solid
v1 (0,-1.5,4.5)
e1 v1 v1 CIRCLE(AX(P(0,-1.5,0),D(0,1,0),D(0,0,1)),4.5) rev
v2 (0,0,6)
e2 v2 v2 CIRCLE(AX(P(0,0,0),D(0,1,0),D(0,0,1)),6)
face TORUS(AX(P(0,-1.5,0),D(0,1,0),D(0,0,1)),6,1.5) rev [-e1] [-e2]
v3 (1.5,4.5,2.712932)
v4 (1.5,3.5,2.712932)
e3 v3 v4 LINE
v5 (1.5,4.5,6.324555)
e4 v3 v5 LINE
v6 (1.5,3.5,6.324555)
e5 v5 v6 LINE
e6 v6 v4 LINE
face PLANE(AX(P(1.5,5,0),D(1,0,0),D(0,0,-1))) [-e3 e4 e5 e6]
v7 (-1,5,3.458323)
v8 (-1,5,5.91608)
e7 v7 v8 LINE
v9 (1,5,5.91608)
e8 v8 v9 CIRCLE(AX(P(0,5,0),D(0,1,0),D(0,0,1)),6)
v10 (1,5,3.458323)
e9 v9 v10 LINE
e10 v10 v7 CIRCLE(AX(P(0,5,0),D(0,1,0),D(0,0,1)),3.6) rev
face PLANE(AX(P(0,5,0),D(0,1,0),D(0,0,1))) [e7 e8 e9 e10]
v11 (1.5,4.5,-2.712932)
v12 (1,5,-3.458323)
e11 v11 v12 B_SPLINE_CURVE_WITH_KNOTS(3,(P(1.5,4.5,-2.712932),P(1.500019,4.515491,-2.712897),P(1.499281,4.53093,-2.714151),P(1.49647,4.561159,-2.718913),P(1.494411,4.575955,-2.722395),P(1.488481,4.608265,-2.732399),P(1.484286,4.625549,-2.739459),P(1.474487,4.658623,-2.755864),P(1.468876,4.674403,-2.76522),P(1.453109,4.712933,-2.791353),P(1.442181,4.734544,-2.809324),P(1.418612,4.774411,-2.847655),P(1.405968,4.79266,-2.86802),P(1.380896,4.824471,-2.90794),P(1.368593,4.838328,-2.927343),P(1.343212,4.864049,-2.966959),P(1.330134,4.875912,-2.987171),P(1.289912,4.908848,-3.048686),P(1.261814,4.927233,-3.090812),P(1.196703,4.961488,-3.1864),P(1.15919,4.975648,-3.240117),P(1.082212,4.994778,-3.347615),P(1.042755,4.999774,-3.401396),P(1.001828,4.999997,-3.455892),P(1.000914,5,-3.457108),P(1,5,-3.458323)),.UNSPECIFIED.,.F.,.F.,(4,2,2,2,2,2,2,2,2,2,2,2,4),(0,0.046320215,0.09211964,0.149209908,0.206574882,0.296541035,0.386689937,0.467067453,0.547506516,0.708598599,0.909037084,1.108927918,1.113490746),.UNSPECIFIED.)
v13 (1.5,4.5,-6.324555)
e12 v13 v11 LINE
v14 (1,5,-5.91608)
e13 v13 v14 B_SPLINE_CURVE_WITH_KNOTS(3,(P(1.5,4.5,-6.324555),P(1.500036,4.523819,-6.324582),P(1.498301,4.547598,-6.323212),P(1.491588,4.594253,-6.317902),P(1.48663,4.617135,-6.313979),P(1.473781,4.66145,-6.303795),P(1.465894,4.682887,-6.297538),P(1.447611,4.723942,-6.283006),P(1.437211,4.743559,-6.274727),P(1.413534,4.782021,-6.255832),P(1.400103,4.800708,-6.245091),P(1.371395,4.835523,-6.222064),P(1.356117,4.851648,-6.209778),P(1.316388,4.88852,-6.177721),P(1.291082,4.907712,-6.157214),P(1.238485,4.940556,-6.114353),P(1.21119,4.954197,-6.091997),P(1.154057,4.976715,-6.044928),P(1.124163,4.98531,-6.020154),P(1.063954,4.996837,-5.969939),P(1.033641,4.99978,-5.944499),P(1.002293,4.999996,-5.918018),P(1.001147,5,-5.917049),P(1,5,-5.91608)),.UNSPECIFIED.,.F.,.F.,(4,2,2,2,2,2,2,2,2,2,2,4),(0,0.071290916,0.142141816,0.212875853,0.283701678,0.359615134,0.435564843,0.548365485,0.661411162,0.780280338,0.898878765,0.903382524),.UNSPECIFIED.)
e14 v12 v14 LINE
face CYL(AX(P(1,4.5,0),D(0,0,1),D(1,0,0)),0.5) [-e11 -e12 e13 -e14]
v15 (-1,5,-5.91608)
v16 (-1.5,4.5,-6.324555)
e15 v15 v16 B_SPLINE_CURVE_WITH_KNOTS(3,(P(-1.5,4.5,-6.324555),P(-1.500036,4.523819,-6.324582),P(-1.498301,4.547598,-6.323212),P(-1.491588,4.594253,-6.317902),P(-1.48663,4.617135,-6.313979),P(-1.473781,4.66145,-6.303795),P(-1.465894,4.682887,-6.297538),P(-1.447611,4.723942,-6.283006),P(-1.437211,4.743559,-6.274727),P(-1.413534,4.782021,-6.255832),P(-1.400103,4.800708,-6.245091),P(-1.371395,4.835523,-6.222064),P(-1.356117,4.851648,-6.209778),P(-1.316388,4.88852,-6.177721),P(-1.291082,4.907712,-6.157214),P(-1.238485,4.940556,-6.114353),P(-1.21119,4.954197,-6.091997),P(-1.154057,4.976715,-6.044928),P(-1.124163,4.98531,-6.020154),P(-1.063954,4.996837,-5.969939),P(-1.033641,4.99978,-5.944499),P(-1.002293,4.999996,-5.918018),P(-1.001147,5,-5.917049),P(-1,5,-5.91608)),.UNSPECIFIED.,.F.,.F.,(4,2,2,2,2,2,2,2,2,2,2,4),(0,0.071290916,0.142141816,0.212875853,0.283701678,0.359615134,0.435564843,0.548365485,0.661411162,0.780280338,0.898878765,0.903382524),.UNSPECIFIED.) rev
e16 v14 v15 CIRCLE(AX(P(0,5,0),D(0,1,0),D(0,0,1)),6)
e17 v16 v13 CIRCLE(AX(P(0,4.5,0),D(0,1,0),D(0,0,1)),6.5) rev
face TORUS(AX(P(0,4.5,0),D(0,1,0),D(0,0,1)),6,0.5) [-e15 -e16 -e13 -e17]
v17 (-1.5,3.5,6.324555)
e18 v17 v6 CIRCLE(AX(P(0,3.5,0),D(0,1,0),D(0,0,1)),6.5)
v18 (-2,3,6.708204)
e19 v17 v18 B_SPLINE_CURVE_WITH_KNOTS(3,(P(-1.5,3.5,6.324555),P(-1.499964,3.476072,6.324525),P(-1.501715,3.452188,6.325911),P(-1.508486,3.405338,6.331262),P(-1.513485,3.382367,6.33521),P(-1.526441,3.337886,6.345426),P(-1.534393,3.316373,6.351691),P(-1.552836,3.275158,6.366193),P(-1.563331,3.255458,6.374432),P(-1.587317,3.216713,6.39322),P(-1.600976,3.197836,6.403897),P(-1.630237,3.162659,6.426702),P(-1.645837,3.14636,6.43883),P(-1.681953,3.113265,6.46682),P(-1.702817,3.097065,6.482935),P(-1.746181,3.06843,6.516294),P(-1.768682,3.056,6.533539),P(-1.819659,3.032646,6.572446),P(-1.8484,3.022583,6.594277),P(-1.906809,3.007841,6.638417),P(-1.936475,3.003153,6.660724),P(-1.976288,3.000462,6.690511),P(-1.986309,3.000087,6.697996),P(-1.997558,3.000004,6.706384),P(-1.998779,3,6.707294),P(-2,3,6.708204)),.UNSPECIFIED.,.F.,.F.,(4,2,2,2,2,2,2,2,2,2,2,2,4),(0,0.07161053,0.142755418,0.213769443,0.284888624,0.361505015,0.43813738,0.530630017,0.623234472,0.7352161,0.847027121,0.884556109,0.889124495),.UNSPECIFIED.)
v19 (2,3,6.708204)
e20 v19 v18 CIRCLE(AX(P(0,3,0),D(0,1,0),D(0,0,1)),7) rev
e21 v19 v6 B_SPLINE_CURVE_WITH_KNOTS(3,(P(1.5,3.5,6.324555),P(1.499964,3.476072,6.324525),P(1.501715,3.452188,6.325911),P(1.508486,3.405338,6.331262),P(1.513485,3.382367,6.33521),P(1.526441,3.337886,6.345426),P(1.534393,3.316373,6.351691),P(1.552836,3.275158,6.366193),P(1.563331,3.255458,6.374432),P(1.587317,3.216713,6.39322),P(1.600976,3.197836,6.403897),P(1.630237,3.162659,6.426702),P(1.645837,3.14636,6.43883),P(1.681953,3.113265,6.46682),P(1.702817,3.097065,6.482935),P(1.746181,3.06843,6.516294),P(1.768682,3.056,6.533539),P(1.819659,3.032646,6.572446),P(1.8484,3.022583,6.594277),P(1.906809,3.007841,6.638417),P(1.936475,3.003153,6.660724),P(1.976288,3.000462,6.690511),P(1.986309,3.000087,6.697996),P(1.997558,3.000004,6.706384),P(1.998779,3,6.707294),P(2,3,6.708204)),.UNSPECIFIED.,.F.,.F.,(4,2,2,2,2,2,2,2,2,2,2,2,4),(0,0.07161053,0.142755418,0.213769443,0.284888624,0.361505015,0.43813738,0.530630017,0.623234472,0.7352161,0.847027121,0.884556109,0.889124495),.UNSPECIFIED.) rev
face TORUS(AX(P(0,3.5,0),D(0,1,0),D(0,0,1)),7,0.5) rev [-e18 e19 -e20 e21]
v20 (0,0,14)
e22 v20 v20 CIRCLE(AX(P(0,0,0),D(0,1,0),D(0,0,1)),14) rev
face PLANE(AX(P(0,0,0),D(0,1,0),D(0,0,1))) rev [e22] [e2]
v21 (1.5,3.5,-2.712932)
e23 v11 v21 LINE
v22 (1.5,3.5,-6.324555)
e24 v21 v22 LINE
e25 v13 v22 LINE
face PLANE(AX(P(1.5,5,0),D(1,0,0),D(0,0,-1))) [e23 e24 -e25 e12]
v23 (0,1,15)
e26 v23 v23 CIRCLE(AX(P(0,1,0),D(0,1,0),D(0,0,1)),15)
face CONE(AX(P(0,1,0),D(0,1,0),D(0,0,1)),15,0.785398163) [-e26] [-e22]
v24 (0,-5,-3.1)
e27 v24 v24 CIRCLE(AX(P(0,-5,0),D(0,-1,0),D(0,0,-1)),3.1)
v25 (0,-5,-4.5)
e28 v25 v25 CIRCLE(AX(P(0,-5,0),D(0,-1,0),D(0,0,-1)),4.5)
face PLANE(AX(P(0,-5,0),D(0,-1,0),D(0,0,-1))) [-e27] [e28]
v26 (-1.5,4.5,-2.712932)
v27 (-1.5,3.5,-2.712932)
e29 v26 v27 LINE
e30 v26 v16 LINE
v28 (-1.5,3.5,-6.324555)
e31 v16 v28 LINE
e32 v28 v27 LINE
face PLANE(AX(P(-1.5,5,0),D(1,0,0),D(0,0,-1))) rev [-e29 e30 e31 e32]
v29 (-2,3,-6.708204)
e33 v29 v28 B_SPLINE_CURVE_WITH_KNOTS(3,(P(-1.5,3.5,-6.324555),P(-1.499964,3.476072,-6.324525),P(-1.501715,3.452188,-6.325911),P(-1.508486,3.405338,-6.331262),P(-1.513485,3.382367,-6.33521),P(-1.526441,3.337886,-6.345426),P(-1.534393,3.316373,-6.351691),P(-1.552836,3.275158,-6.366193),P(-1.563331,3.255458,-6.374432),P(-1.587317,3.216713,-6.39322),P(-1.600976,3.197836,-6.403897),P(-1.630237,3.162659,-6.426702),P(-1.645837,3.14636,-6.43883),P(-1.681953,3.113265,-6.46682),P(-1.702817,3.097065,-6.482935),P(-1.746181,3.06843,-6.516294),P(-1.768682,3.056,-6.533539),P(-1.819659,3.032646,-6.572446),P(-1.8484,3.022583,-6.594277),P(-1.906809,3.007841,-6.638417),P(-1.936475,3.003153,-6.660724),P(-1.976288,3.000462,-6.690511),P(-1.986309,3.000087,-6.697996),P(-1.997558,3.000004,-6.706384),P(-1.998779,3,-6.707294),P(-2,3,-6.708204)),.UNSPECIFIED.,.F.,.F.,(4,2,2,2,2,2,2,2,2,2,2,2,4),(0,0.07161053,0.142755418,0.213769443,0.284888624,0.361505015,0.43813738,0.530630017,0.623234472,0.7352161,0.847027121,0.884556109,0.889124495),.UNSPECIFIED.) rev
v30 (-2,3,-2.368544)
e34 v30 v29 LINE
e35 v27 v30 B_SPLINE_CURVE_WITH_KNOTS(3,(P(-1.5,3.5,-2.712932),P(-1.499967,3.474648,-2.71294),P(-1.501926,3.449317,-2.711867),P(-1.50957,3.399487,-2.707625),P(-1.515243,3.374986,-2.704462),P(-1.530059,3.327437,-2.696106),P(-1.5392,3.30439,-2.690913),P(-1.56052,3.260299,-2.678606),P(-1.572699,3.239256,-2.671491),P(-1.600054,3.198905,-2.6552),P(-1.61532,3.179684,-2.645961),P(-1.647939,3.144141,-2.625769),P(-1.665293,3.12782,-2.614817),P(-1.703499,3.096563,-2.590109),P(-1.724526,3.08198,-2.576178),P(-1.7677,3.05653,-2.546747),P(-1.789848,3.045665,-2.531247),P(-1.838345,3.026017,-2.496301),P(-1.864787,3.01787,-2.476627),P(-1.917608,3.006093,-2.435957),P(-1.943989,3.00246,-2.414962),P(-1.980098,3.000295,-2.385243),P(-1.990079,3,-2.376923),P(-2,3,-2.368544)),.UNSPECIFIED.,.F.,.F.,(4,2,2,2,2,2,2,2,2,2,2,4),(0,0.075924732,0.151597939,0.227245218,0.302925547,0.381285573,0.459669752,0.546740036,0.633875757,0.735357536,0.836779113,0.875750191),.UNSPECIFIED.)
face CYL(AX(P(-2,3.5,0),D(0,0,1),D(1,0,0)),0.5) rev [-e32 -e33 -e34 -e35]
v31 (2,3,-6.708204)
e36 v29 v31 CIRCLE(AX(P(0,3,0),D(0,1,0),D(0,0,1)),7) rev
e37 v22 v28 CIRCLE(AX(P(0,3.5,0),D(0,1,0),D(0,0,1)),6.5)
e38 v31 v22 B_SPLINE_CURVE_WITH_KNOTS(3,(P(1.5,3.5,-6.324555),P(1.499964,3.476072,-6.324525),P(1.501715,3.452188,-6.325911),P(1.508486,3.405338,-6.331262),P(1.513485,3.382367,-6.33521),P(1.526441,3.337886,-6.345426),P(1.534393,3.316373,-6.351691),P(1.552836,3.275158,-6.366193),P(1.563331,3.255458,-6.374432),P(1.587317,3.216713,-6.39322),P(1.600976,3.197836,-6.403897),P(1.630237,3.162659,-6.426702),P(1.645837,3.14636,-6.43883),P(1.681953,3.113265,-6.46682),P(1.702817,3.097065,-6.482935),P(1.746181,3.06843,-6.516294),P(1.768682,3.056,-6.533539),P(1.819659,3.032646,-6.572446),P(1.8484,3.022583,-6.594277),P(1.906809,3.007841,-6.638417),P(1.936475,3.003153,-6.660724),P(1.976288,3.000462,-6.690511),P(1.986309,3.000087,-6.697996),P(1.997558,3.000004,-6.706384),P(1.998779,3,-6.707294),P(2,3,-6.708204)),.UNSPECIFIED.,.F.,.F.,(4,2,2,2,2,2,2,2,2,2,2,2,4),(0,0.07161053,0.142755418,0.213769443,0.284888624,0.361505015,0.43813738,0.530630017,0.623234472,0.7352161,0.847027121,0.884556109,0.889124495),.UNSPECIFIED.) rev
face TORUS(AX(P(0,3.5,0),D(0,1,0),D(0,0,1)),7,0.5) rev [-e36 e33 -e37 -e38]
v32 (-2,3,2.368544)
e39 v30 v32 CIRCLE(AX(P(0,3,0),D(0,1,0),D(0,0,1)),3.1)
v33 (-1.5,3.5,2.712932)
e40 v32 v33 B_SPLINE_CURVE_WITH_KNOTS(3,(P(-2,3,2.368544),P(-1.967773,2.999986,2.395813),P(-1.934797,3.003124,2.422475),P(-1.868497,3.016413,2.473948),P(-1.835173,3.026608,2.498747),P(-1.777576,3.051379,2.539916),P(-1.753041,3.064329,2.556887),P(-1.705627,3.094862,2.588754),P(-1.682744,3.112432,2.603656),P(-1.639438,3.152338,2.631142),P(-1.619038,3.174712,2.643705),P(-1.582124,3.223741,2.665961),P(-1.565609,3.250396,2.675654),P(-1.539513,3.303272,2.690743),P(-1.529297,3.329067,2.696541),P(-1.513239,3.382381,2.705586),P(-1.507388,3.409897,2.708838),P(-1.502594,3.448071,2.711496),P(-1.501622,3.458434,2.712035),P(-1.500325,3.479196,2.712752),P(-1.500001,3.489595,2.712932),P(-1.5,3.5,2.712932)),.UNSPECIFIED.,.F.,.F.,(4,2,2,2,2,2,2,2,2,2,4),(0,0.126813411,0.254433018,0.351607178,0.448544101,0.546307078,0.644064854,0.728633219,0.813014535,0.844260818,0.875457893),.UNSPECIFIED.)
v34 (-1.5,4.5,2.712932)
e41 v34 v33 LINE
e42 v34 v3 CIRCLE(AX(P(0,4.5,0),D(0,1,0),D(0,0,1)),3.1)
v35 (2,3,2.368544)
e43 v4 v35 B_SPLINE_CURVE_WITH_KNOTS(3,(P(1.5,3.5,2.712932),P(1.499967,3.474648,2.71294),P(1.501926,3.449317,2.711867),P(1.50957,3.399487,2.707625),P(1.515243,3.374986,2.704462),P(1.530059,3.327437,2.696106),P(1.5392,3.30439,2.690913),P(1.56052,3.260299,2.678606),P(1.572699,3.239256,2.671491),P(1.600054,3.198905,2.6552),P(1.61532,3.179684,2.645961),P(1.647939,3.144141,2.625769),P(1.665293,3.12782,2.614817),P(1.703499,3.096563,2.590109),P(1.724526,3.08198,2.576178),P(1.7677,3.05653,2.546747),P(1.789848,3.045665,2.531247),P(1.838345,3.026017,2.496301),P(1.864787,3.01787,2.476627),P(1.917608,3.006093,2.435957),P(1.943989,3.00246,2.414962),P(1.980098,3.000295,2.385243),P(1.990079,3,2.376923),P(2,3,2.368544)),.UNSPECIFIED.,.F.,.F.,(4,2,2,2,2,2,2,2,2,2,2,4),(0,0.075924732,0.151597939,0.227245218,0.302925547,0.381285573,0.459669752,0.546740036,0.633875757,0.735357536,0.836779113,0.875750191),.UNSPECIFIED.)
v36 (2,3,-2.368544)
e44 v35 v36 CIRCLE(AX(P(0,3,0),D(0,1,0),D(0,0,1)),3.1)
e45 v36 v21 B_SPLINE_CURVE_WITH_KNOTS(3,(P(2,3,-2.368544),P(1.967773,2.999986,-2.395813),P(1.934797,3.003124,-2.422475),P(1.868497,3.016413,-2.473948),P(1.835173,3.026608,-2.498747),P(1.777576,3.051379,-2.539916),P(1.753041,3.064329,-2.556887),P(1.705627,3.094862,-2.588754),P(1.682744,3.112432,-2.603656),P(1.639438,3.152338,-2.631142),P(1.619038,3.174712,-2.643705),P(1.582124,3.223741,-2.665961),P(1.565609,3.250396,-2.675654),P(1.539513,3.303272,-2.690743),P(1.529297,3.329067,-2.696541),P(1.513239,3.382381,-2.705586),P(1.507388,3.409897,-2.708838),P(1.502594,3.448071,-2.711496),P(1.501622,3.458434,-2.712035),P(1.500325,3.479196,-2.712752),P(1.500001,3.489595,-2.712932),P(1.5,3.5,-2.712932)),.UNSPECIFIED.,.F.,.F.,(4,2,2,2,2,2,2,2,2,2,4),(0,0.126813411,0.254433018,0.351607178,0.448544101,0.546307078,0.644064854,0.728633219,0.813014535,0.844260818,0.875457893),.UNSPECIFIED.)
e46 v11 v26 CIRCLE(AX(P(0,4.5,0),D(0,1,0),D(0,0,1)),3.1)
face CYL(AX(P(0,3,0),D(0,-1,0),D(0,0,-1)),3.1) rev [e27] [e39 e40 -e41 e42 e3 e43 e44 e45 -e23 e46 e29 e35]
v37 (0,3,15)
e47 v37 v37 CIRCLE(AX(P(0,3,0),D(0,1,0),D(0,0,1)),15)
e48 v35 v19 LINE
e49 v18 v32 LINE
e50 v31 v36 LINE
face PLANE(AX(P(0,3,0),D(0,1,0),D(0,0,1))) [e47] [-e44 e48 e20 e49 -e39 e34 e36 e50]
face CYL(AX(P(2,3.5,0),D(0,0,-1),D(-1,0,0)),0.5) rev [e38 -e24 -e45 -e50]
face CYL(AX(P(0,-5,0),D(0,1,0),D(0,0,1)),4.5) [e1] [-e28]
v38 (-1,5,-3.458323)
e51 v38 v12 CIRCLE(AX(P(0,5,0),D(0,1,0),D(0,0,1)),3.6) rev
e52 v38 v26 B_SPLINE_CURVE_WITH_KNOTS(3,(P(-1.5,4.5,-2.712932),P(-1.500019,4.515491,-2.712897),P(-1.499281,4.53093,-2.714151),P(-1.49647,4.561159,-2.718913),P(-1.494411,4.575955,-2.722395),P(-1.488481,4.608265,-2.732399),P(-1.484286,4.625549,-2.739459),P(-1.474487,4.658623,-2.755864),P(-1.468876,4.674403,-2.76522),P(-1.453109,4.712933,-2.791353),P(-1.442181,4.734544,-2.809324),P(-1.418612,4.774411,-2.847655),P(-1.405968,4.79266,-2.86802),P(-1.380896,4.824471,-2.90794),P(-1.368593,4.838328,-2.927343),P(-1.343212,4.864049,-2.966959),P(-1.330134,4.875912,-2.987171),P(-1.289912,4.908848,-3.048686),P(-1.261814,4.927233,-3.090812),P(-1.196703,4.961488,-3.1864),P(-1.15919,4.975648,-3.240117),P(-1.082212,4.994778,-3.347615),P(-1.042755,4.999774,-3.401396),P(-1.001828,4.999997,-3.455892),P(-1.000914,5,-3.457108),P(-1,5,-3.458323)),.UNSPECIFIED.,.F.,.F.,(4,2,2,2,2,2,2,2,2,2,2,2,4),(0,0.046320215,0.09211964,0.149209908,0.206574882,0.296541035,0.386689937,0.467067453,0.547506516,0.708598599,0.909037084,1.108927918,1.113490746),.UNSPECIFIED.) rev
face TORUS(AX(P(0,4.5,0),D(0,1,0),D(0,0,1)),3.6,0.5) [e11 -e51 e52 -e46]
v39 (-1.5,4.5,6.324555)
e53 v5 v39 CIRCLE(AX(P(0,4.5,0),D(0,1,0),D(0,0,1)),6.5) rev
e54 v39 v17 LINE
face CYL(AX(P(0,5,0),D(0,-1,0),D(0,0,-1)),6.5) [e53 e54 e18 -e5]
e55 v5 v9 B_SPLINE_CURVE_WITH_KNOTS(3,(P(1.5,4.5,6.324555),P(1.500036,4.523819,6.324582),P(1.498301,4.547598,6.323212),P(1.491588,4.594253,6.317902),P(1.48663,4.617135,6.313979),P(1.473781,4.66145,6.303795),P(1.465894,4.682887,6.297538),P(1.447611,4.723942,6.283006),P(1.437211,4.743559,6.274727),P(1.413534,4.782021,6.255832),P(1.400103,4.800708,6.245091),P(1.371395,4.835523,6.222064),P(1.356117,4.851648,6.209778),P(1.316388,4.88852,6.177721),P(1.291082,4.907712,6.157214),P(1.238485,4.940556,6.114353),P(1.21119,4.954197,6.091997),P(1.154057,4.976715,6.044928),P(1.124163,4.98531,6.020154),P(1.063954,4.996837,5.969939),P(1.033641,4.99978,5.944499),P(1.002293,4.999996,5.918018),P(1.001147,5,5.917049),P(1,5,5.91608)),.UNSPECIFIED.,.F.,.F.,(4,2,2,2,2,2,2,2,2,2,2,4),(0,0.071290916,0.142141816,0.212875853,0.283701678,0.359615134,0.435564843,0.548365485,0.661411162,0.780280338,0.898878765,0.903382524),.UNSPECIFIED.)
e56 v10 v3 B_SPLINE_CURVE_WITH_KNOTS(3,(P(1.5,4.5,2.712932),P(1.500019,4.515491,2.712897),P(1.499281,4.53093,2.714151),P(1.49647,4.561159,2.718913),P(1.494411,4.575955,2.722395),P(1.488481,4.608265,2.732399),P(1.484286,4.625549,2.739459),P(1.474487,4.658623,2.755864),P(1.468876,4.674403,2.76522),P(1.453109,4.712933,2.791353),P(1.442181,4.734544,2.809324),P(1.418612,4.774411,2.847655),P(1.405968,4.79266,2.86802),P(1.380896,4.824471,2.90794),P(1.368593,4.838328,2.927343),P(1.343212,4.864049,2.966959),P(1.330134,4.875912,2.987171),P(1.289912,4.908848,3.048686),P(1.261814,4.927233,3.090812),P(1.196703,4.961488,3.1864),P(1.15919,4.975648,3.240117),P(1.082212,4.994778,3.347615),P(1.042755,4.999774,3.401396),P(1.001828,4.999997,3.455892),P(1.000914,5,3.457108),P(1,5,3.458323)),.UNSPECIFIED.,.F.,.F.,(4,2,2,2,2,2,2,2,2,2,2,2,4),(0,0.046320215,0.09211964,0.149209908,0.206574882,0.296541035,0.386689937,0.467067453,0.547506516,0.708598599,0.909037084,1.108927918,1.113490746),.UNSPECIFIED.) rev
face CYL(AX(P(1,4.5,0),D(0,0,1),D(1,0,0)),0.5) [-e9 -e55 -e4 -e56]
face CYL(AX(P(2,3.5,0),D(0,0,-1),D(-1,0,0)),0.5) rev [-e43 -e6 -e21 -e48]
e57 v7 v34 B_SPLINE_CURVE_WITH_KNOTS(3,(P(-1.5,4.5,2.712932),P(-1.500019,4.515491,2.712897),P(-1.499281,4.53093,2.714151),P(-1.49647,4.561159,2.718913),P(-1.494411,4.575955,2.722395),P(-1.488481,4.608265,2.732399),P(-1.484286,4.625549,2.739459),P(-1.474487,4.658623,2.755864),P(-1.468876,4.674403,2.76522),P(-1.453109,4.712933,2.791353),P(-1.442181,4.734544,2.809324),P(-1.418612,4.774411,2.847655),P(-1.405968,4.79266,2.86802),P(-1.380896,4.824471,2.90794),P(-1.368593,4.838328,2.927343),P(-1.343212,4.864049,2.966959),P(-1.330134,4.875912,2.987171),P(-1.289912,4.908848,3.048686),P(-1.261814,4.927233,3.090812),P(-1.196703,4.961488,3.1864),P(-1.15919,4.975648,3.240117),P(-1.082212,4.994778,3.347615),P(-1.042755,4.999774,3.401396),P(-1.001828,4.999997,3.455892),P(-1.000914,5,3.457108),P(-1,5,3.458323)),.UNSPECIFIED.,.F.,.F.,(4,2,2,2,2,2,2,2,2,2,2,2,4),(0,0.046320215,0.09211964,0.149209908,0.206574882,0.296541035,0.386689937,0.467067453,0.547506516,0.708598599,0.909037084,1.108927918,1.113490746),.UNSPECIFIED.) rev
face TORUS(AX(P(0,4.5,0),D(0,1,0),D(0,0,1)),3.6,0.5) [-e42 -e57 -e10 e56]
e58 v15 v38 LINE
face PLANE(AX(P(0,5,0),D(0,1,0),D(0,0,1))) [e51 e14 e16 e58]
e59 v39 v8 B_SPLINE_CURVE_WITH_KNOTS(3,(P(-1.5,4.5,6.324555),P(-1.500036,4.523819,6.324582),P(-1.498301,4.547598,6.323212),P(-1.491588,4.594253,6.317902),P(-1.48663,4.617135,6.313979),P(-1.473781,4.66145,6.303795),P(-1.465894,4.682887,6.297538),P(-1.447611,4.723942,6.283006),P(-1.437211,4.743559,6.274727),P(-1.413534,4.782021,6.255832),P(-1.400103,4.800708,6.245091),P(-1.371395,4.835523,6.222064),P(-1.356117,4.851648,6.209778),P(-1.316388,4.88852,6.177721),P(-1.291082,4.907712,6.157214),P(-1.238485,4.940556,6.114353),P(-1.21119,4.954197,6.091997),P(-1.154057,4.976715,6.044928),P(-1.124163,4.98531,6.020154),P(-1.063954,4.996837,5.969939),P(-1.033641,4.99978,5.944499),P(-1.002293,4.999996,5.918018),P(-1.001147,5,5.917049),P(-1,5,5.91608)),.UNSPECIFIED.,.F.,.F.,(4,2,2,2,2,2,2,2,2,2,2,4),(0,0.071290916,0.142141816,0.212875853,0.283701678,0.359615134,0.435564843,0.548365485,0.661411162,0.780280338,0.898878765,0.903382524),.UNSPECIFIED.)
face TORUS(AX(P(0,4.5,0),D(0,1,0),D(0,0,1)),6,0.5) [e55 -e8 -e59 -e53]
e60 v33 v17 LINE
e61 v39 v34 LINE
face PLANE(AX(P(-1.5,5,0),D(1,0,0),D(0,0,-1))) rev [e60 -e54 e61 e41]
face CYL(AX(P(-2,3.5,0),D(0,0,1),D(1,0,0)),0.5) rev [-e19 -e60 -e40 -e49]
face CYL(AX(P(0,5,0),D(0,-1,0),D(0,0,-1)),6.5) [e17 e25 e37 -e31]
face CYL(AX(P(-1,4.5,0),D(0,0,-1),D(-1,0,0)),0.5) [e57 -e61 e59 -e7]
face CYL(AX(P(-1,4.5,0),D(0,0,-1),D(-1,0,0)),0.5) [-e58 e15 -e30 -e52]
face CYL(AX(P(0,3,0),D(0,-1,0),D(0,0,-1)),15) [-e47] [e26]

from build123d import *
from build123d.topology import SkipClean

# Parameters (mm, degrees)
SKETCH_1_R      = 15
SKETCH_1_R_2    = 3.1
EXTRUDE_1_DEPTH = 3
EXTRUDE_2_DEPTH = 2
FILLET_1_R      = 0.5
EXTRUDE_START   = 5
SKETCH_3_R      = 4.5
SKETCH_3_R_2    = 3.1
EXTRUDE_3_DEPTH = 5
FILLET_2_R      = 1.5
CHAMFER_1_SIZE  = 1


with BuildPart() as part:
    # Эскиз1 → Бобышка-Вытянуть1 (new body)
    with BuildSketch(Plane(origin=(0, 0, 0), x_dir=(1, 0, 0), z_dir=(0, 1, 0))):
        with Locations(Location((0, 0, 0), (0, 0, 270))):
            Circle(SKETCH_1_R)
        with Locations(Location((0, 0, 0), (0, 0, 270))):
            Circle(SKETCH_1_R_2, mode=Mode.SUBTRACT)
    extrude(amount=EXTRUDE_1_DEPTH)

    # Эскиз2 → Бобышка-Вытянуть2 (add)
    with SkipClean():  # the faces are left unmerged after this step: merging them gives an invalid solid
        with BuildSketch(Plane(origin=(0, 3, 0), x_dir=(1, 0, 0), z_dir=(0, 1, 0))):
            with BuildLine():
                ThreePointArc((1.5, 6.32455532), (0.755112713, 6.455989838), (0, 6.5))
                ThreePointArc((0, 6.5), (-0.755112713, 6.455989838), (-1.5, 6.32455532))
                Line((-1.5, 6.32455532), (-1.5, 2.712931993))
                ThreePointArc((-1.5, 2.712931993), (0, 3.1), (1.5, 2.712931993))
                Line((1.5, 2.712931993), (1.5, 6.32455532))
            make_face()
            with BuildLine():
                Line((-1.5, -2.712931993), (-1.5, -6.32455532))
                ThreePointArc((-1.5, -6.32455532), (-0.755112713, -6.455989838), (0, -6.5))
                ThreePointArc((0, -6.5), (0.755112713, -6.455989838), (1.5, -6.32455532))
                Line((1.5, -6.32455532), (1.5, -2.712931993))
                ThreePointArc((1.5, -2.712931993), (0, -3.1), (-1.5, -2.712931993))
            make_face()
        extrude(amount=EXTRUDE_2_DEPTH)

    # Скругление1
    # the kernel refuses this fillet: 0.5 mm, written as the material it adds along each edge
    with BuildSketch(Plane(origin=(0, 3, 0), x_dir=(0.4124871852399922, 0, -0.9109634032236357), z_dir=(0.9109634032236357, 0, 0.4124871852399922))) as fillet_1_piece_1_section:
        with BuildLine():
            CenterArc((6.5 + FILLET_1_R, FILLET_1_R), FILLET_1_R, 180, 90)
            Line((6.5, FILLET_1_R), (6.5, 0))
            Line((6.5, 0), (6.5 + FILLET_1_R, 0))
        make_face()
    fillet_1_piece_1 = revolve(axis=Axis((0, 3, 0), (0, 1, 0)), revolution_arc=48.722343885, mode=Mode.PRIVATE)
    fillet_1_piece_1 = split(fillet_1_piece_1, bisect_by=Plane(origin=(1.5, 3.113215634, -6.55559714), z_dir=(-1, 0, 0)), keep=Keep.TOP, mode=Mode.PRIVATE)
    fillet_1_piece_1 = split(fillet_1_piece_1, bisect_by=Plane(origin=(-1.5, 3.113215634, -6.55559714), z_dir=(1, 0, 0)), keep=Keep.TOP, mode=Mode.PRIVATE)
    add(fillet_1_piece_1)
    with BuildSketch(Plane(origin=(-1.5, 3, -7.57455532), x_dir=(-1, 0, 0), z_dir=(0, 0, 1))) as fillet_1_piece_2_section:
        with BuildLine():
            CenterArc((FILLET_1_R, -FILLET_1_R), FILLET_1_R, 90, 90)
            Line((0, -FILLET_1_R), (0, 0))
            Line((0, 0), (FILLET_1_R, 0))
        make_face()
    fillet_1_piece_2 = extrude(amount=6.111623327, mode=Mode.PRIVATE)
    fillet_1_piece_2 = fillet_1_piece_2 - Plane(origin=(0, 3.112507471, 0), x_dir=(0, 0, 1), z_dir=(0, -1, 0)) * Cylinder(3.1, 15, mode=Mode.PRIVATE)
    fillet_1_piece_2 = fillet_1_piece_2 & Plane(origin=(0, 3.112507471, 0), x_dir=(0.23076923076923161, 0, -0.9730085108210397), z_dir=(0, -1, 0)) * Cylinder(6.5, 15, mode=Mode.PRIVATE)
    add(fillet_1_piece_2)
    with BuildSketch(Plane(origin=(1.5, 3, -1.462931993), x_dir=(1, 0, 0), z_dir=(0, 0, -1))) as fillet_1_piece_3_section:
        with BuildLine():
            CenterArc((FILLET_1_R, -FILLET_1_R), FILLET_1_R, 90, 90)
            Line((0, -FILLET_1_R), (0, 0))
            Line((0, 0), (FILLET_1_R, 0))
        make_face()
    fillet_1_piece_3 = extrude(amount=6.111623327, mode=Mode.PRIVATE)
    fillet_1_piece_3 = fillet_1_piece_3 - Plane(origin=(0, 3.112507453, 0), x_dir=(0, 0, 1), z_dir=(0, -1, 0)) * Cylinder(3.1, 15, mode=Mode.PRIVATE)
    fillet_1_piece_3 = fillet_1_piece_3 & Plane(origin=(0, 3.112507453, 0), x_dir=(0.23076923076923161, 0, -0.9730085108210397), z_dir=(0, -1, 0)) * Cylinder(6.5, 15, mode=Mode.PRIVATE)
    add(fillet_1_piece_3)
    with BuildSketch(Plane(origin=(0, 3, 0), x_dir=(-0.41248718523999056, 0, 0.9109634032236364), z_dir=(-0.9109634032236364, 0, -0.41248718523999056))) as fillet_1_piece_4_section:
        with BuildLine():
            CenterArc((6.5 + FILLET_1_R, FILLET_1_R), FILLET_1_R, 180, 90)
            Line((6.5, FILLET_1_R), (6.5, 0))
            Line((6.5, 0), (6.5 + FILLET_1_R, 0))
        make_face()
    fillet_1_piece_4 = revolve(axis=Axis((0, 3, 0), (0, 1, 0)), revolution_arc=48.722343885, mode=Mode.PRIVATE)
    fillet_1_piece_4 = split(fillet_1_piece_4, bisect_by=Plane(origin=(-1.5, 3.113215634, 6.55559714), z_dir=(1, 0, 0)), keep=Keep.TOP, mode=Mode.PRIVATE)
    fillet_1_piece_4 = split(fillet_1_piece_4, bisect_by=Plane(origin=(1.5, 3.113215634, 6.55559714), z_dir=(-1, 0, 0)), keep=Keep.TOP, mode=Mode.PRIVATE)
    add(fillet_1_piece_4)
    with BuildSketch(Plane(origin=(-1.5, 3, 1.462931993), x_dir=(-1, 0, 0), z_dir=(0, 0, 1))) as fillet_1_piece_5_section:
        with BuildLine():
            CenterArc((FILLET_1_R, -FILLET_1_R), FILLET_1_R, 90, 90)
            Line((0, -FILLET_1_R), (0, 0))
            Line((0, 0), (FILLET_1_R, 0))
        make_face()
    fillet_1_piece_5 = extrude(amount=6.111623327, mode=Mode.PRIVATE)
    fillet_1_piece_5 = fillet_1_piece_5 - Plane(origin=(0, 3.112507486, 0), x_dir=(0, 0, 1), z_dir=(0, -1, 0)) * Cylinder(3.1, 15, mode=Mode.PRIVATE)
    fillet_1_piece_5 = fillet_1_piece_5 & Plane(origin=(0, 3.112507486, 0), x_dir=(-0.2307692307692237, 0, 0.9730085108210416), z_dir=(0, -1, 0)) * Cylinder(6.5, 15, mode=Mode.PRIVATE)
    add(fillet_1_piece_5)
    with BuildSketch(Plane(origin=(1.5, 3, 7.57455532), x_dir=(1, 0, 0), z_dir=(0, 0, -1))) as fillet_1_piece_6_section:
        with BuildLine():
            CenterArc((FILLET_1_R, -FILLET_1_R), FILLET_1_R, 90, 90)
            Line((0, -FILLET_1_R), (0, 0))
            Line((0, 0), (FILLET_1_R, 0))
        make_face()
    fillet_1_piece_6 = extrude(amount=6.111623327, mode=Mode.PRIVATE)
    fillet_1_piece_6 = fillet_1_piece_6 - Plane(origin=(0, 3.112507471, 0), x_dir=(0, 0, 1), z_dir=(0, -1, 0)) * Cylinder(3.1, 15, mode=Mode.PRIVATE)
    fillet_1_piece_6 = fillet_1_piece_6 & Plane(origin=(0, 3.112507471, 0), x_dir=(-0.2307692307692237, 0, 0.9730085108210416), z_dir=(0, -1, 0)) * Cylinder(6.5, 15, mode=Mode.PRIVATE)
    add(fillet_1_piece_6)
    with BuildSketch(Plane(origin=(1.5, 3, -1.462931993), x_dir=(1, 0, 0), z_dir=(0, 0, -1))) as fillet_1_piece_7a_section:
        with BuildLine():
            CenterArc((FILLET_1_R, -FILLET_1_R), FILLET_1_R, 90, 90)
            Line((0, -FILLET_1_R), (0, 0))
            Line((0, 0), (FILLET_1_R, 0))
        make_face()
    fillet_1_piece_7a = extrude(amount=6.111623327, mode=Mode.PRIVATE)
    fillet_1_piece_7a = fillet_1_piece_7a - Plane(origin=(0, 3.111790951, 0), x_dir=(0.23076923076923161, 0, -0.9730085108210397), z_dir=(0, -1, 0)) * Cylinder(6.5, 15, mode=Mode.PRIVATE)
    with BuildSketch(Plane(origin=(0, 3, 0), x_dir=(0.4124871852399922, 0, -0.9109634032236357), z_dir=(0.9109634032236357, 0, 0.4124871852399922))) as fillet_1_piece_7b_section:
        with BuildLine():
            CenterArc((6.5 + FILLET_1_R, FILLET_1_R), FILLET_1_R, 180, 90)
            Line((6.5, FILLET_1_R), (6.5, 0))
            Line((6.5, 0), (6.5 + FILLET_1_R, 0))
        make_face()
    fillet_1_piece_7b = revolve(axis=Axis((0, 3, 0), (0, 1, 0)), revolution_arc=48.722343885, mode=Mode.PRIVATE)
    fillet_1_piece_7b = split(fillet_1_piece_7b, bisect_by=Plane(origin=(1.5, 3.110928804, -6.256458374), z_dir=(1, 0, 0)), keep=Keep.TOP, mode=Mode.PRIVATE)
    fillet_1_piece_7 = fillet_1_piece_7a & fillet_1_piece_7b
    add(fillet_1_piece_7)
    with BuildSketch(Plane(origin=(0, 3, 0), x_dir=(0.4124871852399922, 0, -0.9109634032236357), z_dir=(0.9109634032236357, 0, 0.4124871852399922))) as fillet_1_piece_8a_section:
        with BuildLine():
            CenterArc((6.5 + FILLET_1_R, FILLET_1_R), FILLET_1_R, 180, 90)
            Line((6.5, FILLET_1_R), (6.5, 0))
            Line((6.5, 0), (6.5 + FILLET_1_R, 0))
        make_face()
    fillet_1_piece_8a = revolve(axis=Axis((0, 3, 0), (0, 1, 0)), revolution_arc=48.722343885, mode=Mode.PRIVATE)
    fillet_1_piece_8a = split(fillet_1_piece_8a, bisect_by=Plane(origin=(-1.5, 3.110928929, -6.256457803), z_dir=(-1, 0, 0)), keep=Keep.TOP, mode=Mode.PRIVATE)
    with BuildSketch(Plane(origin=(-1.5, 3, -7.57455532), x_dir=(-1, 0, 0), z_dir=(0, 0, 1))) as fillet_1_piece_8b_section:
        with BuildLine():
            CenterArc((FILLET_1_R, -FILLET_1_R), FILLET_1_R, 90, 90)
            Line((0, -FILLET_1_R), (0, 0))
            Line((0, 0), (FILLET_1_R, 0))
        make_face()
    fillet_1_piece_8b = extrude(amount=6.111623327, mode=Mode.PRIVATE)
    fillet_1_piece_8b = fillet_1_piece_8b - Plane(origin=(0, 3.11179098, 0), x_dir=(0.23076923076923161, 0, -0.9730085108210397), z_dir=(0, -1, 0)) * Cylinder(6.5, 15, mode=Mode.PRIVATE)
    fillet_1_piece_8 = fillet_1_piece_8a & fillet_1_piece_8b
    add(fillet_1_piece_8)
    with BuildSketch(Plane(origin=(-1.5, 3, 1.462931993), x_dir=(-1, 0, 0), z_dir=(0, 0, 1))) as fillet_1_piece_9a_section:
        with BuildLine():
            CenterArc((FILLET_1_R, -FILLET_1_R), FILLET_1_R, 90, 90)
            Line((0, -FILLET_1_R), (0, 0))
            Line((0, 0), (FILLET_1_R, 0))
        make_face()
    fillet_1_piece_9a = extrude(amount=6.111623327, mode=Mode.PRIVATE)
    fillet_1_piece_9a = fillet_1_piece_9a - Plane(origin=(0, 3.11179098, 0), x_dir=(-0.2307692307692237, 0, 0.9730085108210416), z_dir=(0, -1, 0)) * Cylinder(6.5, 15, mode=Mode.PRIVATE)
    with BuildSketch(Plane(origin=(0, 3, 0), x_dir=(-0.41248718523999056, 0, 0.9109634032236364), z_dir=(-0.9109634032236364, 0, -0.41248718523999056))) as fillet_1_piece_9b_section:
        with BuildLine():
            CenterArc((6.5 + FILLET_1_R, FILLET_1_R), FILLET_1_R, 180, 90)
            Line((6.5, FILLET_1_R), (6.5, 0))
            Line((6.5, 0), (6.5 + FILLET_1_R, 0))
        make_face()
    fillet_1_piece_9b = revolve(axis=Axis((0, 3, 0), (0, 1, 0)), revolution_arc=48.722343885, mode=Mode.PRIVATE)
    fillet_1_piece_9b = split(fillet_1_piece_9b, bisect_by=Plane(origin=(-1.5, 3.110928804, 6.256458374), z_dir=(-1, 0, 0)), keep=Keep.TOP, mode=Mode.PRIVATE)
    fillet_1_piece_9 = fillet_1_piece_9a & fillet_1_piece_9b
    add(fillet_1_piece_9)
    with BuildSketch(Plane(origin=(0, 3, 0), x_dir=(-0.41248718523999056, 0, 0.9109634032236364), z_dir=(-0.9109634032236364, 0, -0.41248718523999056))) as fillet_1_piece_10a_section:
        with BuildLine():
            CenterArc((6.5 + FILLET_1_R, FILLET_1_R), FILLET_1_R, 180, 90)
            Line((6.5, FILLET_1_R), (6.5, 0))
            Line((6.5, 0), (6.5 + FILLET_1_R, 0))
        make_face()
    fillet_1_piece_10a = revolve(axis=Axis((0, 3, 0), (0, 1, 0)), revolution_arc=48.722343885, mode=Mode.PRIVATE)
    fillet_1_piece_10a = split(fillet_1_piece_10a, bisect_by=Plane(origin=(1.5, 3.110928929, 6.256457803), z_dir=(1, 0, 0)), keep=Keep.TOP, mode=Mode.PRIVATE)
    with BuildSketch(Plane(origin=(1.5, 3, 7.57455532), x_dir=(1, 0, 0), z_dir=(0, 0, -1))) as fillet_1_piece_10b_section:
        with BuildLine():
            CenterArc((FILLET_1_R, -FILLET_1_R), FILLET_1_R, 90, 90)
            Line((0, -FILLET_1_R), (0, 0))
            Line((0, 0), (FILLET_1_R, 0))
        make_face()
    fillet_1_piece_10b = extrude(amount=6.111623327, mode=Mode.PRIVATE)
    fillet_1_piece_10b = fillet_1_piece_10b - Plane(origin=(0, 3.11179098, 0), x_dir=(-0.2307692307692237, 0, 0.9730085108210416), z_dir=(0, -1, 0)) * Cylinder(6.5, 15, mode=Mode.PRIVATE)
    fillet_1_piece_10 = fillet_1_piece_10a & fillet_1_piece_10b
    add(fillet_1_piece_10)
    # the kernel refuses this fillet: 0.5 mm, written as the material it takes off along each edge
    with BuildSketch(Plane(origin=(1.5, 5, -1.462931993), x_dir=(0, -1, 0), z_dir=(0, 0, -1)), Plane(origin=(-1.5, 5, -7.57455532), x_dir=(0, -1, 0), z_dir=(0, 0, 1)), Plane(origin=(1.5, 5, 7.57455532), x_dir=(0, -1, 0), z_dir=(0, 0, -1)), Plane(origin=(-1.5, 5, 1.462931993), x_dir=(0, -1, 0), z_dir=(0, 0, 1))) as fillet_1_2_piece_1:
        with BuildLine():
            CenterArc((FILLET_1_R, FILLET_1_R), FILLET_1_R, 180, 90)
            Line((0, FILLET_1_R), (0, 0))
            Line((0, 0), (FILLET_1_R, 0))
        make_face()
    extrude(amount=6.111623327, mode=Mode.SUBTRACT)
    with BuildSketch(Plane(origin=(0, 5, 0), x_dir=(-0.4124871852399967, 0, -0.9109634032236337), z_dir=(-0.9109634032236337, 0, 0.4124871852399967))) as fillet_1_2_piece_2:
        with BuildLine():
            CenterArc((6.5 - FILLET_1_R, FILLET_1_R), FILLET_1_R, 270, 90)
            Line((6.5 - FILLET_1_R, 0), (6.5, 0))
            Line((6.5, 0), (6.5, FILLET_1_R))
        make_face()
    revolve(axis=Axis((0, 5, 0), (0, -1, 0)), revolution_arc=48.722343885, mode=Mode.SUBTRACT)
    with BuildSketch(Plane(origin=(0, 5, 0), x_dir=(-0.7884994391105064, 0, -0.6150354741983723), z_dir=(-0.6150354741983723, 0, 0.7884994391105064))) as fillet_1_2_piece_3:
        with BuildLine():
            CenterArc((3.1 + FILLET_1_R, FILLET_1_R), FILLET_1_R, 180, 90)
            Line((3.1 + FILLET_1_R, 0), (3.1, 0))
            Line((3.1, 0), (3.1, FILLET_1_R))
        make_face()
    revolve(axis=Axis((0, 5, 0), (0, -1, 0)), revolution_arc=104.091004095, mode=Mode.SUBTRACT)
    with BuildSketch(Plane(origin=(0, 5, 0), x_dir=(0.4124871852399923, 0, 0.9109634032236357), z_dir=(0.9109634032236357, 0, -0.4124871852399923))) as fillet_1_2_piece_4:
        with BuildLine():
            CenterArc((6.5 - FILLET_1_R, FILLET_1_R), FILLET_1_R, 270, 90)
            Line((6.5 - FILLET_1_R, 0), (6.5, 0))
            Line((6.5, 0), (6.5, FILLET_1_R))
        make_face()
    revolve(axis=Axis((0, 5, 0), (0, -1, 0)), revolution_arc=48.722343885, mode=Mode.SUBTRACT)
    with BuildSketch(Plane(origin=(0, 5, 0), x_dir=(0.788499439110485, 0, 0.6150354741983998), z_dir=(0.6150354741983998, 0, -0.788499439110485))) as fillet_1_2_piece_5:
        with BuildLine():
            CenterArc((3.1 + FILLET_1_R, FILLET_1_R), FILLET_1_R, 180, 90)
            Line((3.1 + FILLET_1_R, 0), (3.1, 0))
            Line((3.1, 0), (3.1, FILLET_1_R))
        make_face()
    revolve(axis=Axis((0, 5, 0), (0, -1, 0)), revolution_arc=104.091004095, mode=Mode.SUBTRACT)

    # Эскиз3 → Бобышка-Вытянуть3 (add)
    with SkipClean():  # the faces are left unmerged after this step: merging them gives an invalid solid
        with BuildSketch(Plane.XZ.offset(EXTRUDE_START)):
            with Locations(Location((0, 0, 0), (0, 0, 90))):
                Circle(SKETCH_3_R)
            with Locations(Location((0, 0, 0), (0, 0, 270))):
                Circle(SKETCH_3_R_2, mode=Mode.SUBTRACT)
        extrude(amount=-EXTRUDE_3_DEPTH)
    add(part.part.scale(1), mode=Mode.REPLACE)  # the faces are merged on a copy

    # Скругление2
    fillet_2_edges = [part.edges().sort_by_distance(p)[0] for p in [
        (0, 0, -4.5),
    ]]
    fillet(fillet_2_edges, radius=FILLET_2_R)

    # Фаска1
    chamfer_1_edges = [part.edges().sort_by_distance(p)[0] for p in [
        (0, 0, -15),
    ]]
    chamfer(chamfer_1_edges, length=CHAMFER_1_SIZE)


solid = part.part
